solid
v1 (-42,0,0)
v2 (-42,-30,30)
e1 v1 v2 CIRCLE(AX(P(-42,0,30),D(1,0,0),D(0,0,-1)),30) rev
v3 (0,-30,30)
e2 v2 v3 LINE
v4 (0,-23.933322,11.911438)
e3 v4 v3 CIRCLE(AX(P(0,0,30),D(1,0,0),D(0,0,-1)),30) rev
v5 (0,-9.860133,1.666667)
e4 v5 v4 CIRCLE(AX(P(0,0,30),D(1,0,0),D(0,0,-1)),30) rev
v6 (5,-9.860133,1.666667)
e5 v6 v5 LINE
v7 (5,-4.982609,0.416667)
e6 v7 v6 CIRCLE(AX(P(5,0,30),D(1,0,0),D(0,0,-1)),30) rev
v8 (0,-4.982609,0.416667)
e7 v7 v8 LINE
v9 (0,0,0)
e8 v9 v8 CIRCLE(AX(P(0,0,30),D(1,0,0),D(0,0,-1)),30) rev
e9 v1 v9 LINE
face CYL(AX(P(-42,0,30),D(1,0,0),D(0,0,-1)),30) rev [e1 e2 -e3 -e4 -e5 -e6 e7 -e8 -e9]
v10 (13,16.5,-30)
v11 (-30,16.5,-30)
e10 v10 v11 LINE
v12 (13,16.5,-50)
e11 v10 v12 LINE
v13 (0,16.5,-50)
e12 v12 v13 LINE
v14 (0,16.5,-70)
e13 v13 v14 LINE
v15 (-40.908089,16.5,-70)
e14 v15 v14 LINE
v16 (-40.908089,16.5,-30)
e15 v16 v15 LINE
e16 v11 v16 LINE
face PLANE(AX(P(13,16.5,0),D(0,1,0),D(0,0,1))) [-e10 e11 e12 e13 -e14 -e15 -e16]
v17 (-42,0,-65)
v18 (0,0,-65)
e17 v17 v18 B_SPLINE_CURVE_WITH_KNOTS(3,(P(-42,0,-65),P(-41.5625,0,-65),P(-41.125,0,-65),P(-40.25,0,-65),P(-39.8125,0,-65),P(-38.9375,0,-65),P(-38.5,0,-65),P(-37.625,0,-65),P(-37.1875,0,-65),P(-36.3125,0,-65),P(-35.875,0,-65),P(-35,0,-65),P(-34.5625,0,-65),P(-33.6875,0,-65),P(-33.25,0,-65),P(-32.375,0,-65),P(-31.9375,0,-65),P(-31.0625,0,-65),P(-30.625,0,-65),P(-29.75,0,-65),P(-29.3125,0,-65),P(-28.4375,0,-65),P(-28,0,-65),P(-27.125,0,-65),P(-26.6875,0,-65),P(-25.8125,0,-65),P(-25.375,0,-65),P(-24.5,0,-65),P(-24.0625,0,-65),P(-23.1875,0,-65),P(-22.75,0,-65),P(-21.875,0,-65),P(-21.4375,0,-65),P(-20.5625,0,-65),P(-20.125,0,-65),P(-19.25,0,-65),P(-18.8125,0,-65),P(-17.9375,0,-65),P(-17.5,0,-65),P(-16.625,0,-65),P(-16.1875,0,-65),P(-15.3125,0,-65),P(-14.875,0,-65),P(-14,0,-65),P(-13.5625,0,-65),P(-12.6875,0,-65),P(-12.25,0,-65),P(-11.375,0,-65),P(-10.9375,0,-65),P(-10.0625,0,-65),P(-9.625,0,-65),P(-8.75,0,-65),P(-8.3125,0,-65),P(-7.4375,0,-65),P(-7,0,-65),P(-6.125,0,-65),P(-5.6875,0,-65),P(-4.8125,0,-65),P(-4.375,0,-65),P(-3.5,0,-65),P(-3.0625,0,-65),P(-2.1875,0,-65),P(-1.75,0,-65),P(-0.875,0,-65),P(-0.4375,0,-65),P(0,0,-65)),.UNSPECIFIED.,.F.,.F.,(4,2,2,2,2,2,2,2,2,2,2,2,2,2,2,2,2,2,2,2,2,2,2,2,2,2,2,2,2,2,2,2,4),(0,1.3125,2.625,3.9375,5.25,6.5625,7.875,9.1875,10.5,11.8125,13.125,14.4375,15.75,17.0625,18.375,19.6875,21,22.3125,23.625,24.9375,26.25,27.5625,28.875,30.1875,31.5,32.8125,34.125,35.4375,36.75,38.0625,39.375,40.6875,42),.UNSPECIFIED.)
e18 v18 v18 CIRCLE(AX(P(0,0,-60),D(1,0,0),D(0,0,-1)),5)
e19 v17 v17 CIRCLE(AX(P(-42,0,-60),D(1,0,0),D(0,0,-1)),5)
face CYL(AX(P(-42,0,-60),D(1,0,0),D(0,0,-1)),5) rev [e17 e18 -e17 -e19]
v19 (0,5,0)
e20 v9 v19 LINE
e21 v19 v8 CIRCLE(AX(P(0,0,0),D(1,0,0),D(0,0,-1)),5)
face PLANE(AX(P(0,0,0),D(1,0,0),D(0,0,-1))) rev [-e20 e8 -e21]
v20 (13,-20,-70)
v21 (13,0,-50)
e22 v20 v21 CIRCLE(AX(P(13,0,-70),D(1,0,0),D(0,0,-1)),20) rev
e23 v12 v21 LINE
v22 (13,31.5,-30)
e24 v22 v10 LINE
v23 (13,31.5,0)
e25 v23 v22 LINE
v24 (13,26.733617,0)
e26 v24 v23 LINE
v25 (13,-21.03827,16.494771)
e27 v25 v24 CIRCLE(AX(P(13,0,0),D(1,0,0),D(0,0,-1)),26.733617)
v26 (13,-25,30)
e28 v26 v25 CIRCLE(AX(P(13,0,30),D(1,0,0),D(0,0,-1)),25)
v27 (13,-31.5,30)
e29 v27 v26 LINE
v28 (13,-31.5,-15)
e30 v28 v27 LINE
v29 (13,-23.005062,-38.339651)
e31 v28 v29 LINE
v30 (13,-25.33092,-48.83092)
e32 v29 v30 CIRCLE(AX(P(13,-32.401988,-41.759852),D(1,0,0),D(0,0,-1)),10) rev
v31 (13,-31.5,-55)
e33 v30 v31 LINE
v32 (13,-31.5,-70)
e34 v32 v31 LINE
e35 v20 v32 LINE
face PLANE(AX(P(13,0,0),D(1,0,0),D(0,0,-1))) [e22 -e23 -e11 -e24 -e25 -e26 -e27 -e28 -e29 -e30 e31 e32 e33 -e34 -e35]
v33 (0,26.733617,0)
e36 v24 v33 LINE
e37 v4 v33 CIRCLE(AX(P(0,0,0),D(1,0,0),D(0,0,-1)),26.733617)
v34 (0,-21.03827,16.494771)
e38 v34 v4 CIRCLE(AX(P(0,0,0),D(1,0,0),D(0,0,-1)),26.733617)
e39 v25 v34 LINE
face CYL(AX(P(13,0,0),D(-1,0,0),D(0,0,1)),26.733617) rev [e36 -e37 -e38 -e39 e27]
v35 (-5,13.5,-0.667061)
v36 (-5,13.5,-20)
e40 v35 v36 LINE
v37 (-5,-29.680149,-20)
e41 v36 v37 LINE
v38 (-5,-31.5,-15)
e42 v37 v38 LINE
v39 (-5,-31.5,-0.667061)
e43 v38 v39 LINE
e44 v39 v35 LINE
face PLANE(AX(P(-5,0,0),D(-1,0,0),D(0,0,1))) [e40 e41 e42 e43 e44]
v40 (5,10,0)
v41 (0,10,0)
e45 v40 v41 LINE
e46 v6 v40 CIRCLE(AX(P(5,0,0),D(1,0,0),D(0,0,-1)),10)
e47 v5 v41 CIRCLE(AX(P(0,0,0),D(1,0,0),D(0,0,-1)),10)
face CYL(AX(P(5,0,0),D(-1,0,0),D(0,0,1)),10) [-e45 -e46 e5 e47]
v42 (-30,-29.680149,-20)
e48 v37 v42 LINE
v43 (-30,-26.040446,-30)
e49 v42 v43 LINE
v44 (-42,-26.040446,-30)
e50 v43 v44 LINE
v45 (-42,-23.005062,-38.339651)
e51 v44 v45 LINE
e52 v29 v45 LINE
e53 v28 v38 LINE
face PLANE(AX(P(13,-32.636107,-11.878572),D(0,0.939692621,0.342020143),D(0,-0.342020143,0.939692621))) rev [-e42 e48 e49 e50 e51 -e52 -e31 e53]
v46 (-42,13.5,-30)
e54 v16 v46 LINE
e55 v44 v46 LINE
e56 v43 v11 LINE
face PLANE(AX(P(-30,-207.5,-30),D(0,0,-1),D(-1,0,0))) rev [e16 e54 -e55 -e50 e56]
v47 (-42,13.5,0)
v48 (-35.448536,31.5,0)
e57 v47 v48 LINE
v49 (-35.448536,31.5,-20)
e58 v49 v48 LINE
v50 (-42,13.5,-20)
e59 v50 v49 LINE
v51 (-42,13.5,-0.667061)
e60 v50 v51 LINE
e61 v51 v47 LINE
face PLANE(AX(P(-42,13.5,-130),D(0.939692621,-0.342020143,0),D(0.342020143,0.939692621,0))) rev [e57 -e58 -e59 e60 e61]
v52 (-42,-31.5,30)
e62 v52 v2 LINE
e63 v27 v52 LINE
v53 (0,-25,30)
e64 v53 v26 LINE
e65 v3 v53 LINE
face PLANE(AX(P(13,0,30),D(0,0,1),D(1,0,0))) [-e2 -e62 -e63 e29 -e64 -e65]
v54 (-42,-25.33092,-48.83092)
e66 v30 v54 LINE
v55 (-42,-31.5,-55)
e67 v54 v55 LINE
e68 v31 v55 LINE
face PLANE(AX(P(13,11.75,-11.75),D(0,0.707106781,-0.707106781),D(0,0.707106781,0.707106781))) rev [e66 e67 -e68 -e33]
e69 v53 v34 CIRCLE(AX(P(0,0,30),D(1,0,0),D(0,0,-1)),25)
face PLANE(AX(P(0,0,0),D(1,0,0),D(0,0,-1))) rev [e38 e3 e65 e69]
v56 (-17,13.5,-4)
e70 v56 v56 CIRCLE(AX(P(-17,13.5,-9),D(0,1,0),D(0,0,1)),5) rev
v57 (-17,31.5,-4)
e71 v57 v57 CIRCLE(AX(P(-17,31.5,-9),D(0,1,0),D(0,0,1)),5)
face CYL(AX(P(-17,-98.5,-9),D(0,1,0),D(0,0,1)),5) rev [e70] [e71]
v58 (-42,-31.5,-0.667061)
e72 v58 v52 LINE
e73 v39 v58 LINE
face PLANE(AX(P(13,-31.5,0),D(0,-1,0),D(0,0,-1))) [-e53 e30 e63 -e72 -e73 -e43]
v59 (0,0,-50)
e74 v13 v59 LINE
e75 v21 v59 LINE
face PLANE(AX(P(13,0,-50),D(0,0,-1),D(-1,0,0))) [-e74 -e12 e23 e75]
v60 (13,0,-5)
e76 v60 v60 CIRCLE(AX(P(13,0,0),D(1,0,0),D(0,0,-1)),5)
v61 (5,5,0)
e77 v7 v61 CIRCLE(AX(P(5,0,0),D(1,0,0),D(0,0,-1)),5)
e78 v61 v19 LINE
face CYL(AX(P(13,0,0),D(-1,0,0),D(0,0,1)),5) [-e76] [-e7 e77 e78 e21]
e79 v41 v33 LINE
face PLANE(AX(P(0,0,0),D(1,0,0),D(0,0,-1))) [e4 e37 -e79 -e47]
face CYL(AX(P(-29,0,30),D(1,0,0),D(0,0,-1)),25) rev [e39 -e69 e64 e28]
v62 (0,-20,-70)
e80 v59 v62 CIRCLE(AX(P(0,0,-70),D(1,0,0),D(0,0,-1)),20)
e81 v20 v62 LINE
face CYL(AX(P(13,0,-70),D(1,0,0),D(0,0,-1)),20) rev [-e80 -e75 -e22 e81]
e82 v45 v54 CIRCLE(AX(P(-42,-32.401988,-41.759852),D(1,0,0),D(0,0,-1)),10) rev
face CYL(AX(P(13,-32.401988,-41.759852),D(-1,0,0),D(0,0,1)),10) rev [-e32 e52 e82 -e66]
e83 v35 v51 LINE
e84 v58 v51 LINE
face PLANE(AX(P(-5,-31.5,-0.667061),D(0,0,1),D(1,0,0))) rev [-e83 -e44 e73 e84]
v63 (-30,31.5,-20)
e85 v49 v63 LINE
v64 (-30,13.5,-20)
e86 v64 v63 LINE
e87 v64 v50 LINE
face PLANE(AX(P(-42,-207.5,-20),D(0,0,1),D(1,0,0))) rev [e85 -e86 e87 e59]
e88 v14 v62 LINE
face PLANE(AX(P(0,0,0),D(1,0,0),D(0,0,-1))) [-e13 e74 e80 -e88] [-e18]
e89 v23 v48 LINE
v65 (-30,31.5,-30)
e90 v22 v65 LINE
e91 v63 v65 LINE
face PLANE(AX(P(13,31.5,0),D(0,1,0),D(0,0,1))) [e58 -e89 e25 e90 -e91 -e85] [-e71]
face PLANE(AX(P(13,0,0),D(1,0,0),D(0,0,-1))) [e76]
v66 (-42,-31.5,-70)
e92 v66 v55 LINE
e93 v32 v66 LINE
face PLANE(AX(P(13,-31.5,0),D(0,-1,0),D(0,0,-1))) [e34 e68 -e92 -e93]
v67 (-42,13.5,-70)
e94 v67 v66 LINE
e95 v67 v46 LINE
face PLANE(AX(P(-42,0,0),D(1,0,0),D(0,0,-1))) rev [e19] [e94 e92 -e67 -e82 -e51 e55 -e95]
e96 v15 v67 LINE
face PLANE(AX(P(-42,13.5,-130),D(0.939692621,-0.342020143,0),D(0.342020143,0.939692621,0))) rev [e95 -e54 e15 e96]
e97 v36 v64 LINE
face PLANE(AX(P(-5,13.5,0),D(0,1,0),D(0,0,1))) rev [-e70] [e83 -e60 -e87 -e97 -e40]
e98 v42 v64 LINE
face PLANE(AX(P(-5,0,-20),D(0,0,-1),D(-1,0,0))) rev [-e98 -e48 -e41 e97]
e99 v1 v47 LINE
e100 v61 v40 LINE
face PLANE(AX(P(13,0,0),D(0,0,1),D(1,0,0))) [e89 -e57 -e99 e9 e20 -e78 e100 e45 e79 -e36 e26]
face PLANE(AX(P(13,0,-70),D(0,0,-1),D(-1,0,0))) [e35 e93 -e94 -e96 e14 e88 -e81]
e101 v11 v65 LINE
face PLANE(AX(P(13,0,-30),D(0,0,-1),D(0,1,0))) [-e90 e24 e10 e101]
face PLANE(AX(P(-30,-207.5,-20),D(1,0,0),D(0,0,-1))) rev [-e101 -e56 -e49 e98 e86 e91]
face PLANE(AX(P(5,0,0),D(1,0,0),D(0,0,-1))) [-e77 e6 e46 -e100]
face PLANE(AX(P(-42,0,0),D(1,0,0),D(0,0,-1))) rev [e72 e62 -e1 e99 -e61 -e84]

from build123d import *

# Parameters (mm, degrees)
BOSS_EXTRUDE4_DEPTH = 13
BOSS_EXTRUDE5_DEPTH = 5
FILLET2_R           = 20
BOSS_EXTRUDE6_START = -42
SKETCH2_7_R         = 5
BOSS_EXTRUDE6_DEPTH = 42
SKETCH5_R           = 25
CUT_EXTRUDE1_DEPTH  = 42
SKETCH7_W           = 12
SKETCH7_H           = 10
CUT_EXTRUDE2_DEPTH  = 239
SKETCH8_R           = 5
CUT_EXTRUDE3_DEPTH  = 130
CUT_EXTRUDE4_DEPTH  = 130
CUT_EXTRUDE6_DEPTH  = 37


with BuildPart() as part:
    # Sketch2 → Boss-Extrude4 (new body)
    with BuildSketch(Plane(origin=(0, 0, 0), x_dir=(0, 0, -1), z_dir=(1, 0, 0))):
        with BuildLine():
            Line((0, 31.5), (0, 26.733616794))
            ThreePointArc((0, 26.733616794), (26.024128556, -6.118087921), (-11.911437782, -23.933322312))
            ThreePointArc((-11.911437782, -23.933322312), (-20.46059932, -28.4429224), (-30, -30))
            Line((-30, -30), (-30, -31.5))
            Line((-30, -31.5), (15, -31.5))
            Line((15, -31.5), (38.339650933, -23.005061782))
            ThreePointArc((38.339650933, -23.005061782), (43.924248506, -22.639027919), (48.830920178, -25.330920178))
            Line((48.830920178, -25.330920178), (55, -31.5))
            Line((55, -31.5), (70, -31.5))
            Line((70, -31.5), (70, -20))
            Line((70, -20), (50, -20))
            Line((50, -20), (50, 16.5))
            Line((50, 16.5), (30, 16.5))
            Line((30, 16.5), (30, 31.5))
            Line((30, 31.5), (0, 31.5))
        make_face()
        with BuildLine():
            ThreePointArc((5, 0), (3.535533906, 3.535533906), (0, 5))
            Line((0, 5), (0, 0))
            ThreePointArc((0, 0), (-0.104348142, -2.5), (-0.416666667, -4.982608643))
            ThreePointArc((-0.416666667, -4.982608643), (3.385016002, -3.679900361), (5, 0))
        make_face()
        with BuildLine():
            Line((0, 0), (0, 5))
            ThreePointArc((0, 5), (-3.549297202, 3.521716822), (-4.999847865, -0.03900425))
            ThreePointArc((-4.999847865, -0.03900425), (-3.666669267, -3.399343537), (-0.416666667, -4.982608643))
            ThreePointArc((-0.416666667, -4.982608643), (-0.104348142, -2.5), (0, 0))
        make_face()
        with BuildLine():
            ThreePointArc((-30, -30), (-20.46059932, -28.4429224), (-11.911437782, -23.933322312))
            ThreePointArc((-11.911437782, -23.933322312), (-15.61180413, -21.701563048), (-18.904262251, -18.902781162))
            ThreePointArc((-18.904262251, -18.902781162), (-24.302172741, -20.842036984), (-30, -21.5))
            Line((-30, -21.5), (-30, -30))
        make_face()
    extrude(amount=BOSS_EXTRUDE4_DEPTH)

    # Sketch2<6> → Boss-Extrude5 (add)
    with BuildSketch(Plane(origin=(0, 0, 0), x_dir=(0, 0, -1), z_dir=(1, 0, 0))):
        with BuildLine():
            ThreePointArc((-1.666666667, -9.860132972), (9.964971895, -0.836262603), (0, 10))
            Line((0, 10), (0, 5))
            ThreePointArc((0, 5), (3.535533906, 3.535533906), (5, 0))
            ThreePointArc((5, 0), (3.385016002, -3.679900361), (-0.416666667, -4.982608643))
            ThreePointArc((-0.416666667, -4.982608643), (-0.939156407, -7.447641886), (-1.666666667, -9.860132972))
        make_face()
    extrude(amount=BOSS_EXTRUDE5_DEPTH)

    # Fillet2
    fillet2_edges = [part.edges().sort_by_distance(p)[0] for p in [
        (6.5, -20, -50),
    ]]
    fillet(fillet2_edges, radius=FILLET2_R - 0.0001)  # a hair under: the kernel refuses the full size

    # Sketch2<7> → Boss-Extrude6 (add)
    with BuildSketch(Plane(origin=(0, 0, 0), x_dir=(0, 0, -1), z_dir=(1, 0, 0)).offset(BOSS_EXTRUDE6_START)):
        with BuildLine():
            Line((-30, -30), (-30, -31.5))
            Line((-30, -31.5), (15, -31.5))
            Line((15, -31.5), (38.339650933, -23.005061782))
            ThreePointArc((38.339650933, -23.005061782), (43.924248506, -22.639027919), (48.830920178, -25.330920178))
            Line((48.830920178, -25.330920178), (55, -31.5))
            Line((55, -31.5), (70, -31.5))
            Line((70, -31.5), (70, 16.5))
            Line((70, 16.5), (30, 16.5))
            Line((30, 16.5), (30, 31.5))
            Line((30, 31.5), (0, 31.5))
            Line((0, 31.5), (0, 0))
            ThreePointArc((0, 0), (-8.786796564, -21.213203436), (-30, -30))
        make_face()
        with Locations((60, 0)):
            Circle(SKETCH2_7_R, mode=Mode.SUBTRACT)
    extrude(amount=BOSS_EXTRUDE6_DEPTH)

    # Sketch5 → Cut-Extrude1 (cut)
    with BuildSketch(Plane(origin=(13, 0, 0), x_dir=(0, 0, -1), z_dir=(1, 0, 0))):
        with Locations((-30, 0)):
            Circle(SKETCH5_R)
    extrude(amount=-CUT_EXTRUDE1_DEPTH, mode=Mode.SUBTRACT)

    # Sketch7 → Cut-Extrude2 (cut)
    with BuildSketch(Plane(origin=(0, 31.5, 0), x_dir=(1, 0, 0), z_dir=(0, 1, 0))):
        with Locations((-36, 25)):
            Rectangle(SKETCH7_W, SKETCH7_H)
    extrude(amount=-CUT_EXTRUDE2_DEPTH, mode=Mode.SUBTRACT)

    # Sketch8 → Cut-Extrude3 (cut)
    with BuildSketch(Plane(origin=(0, 31.5, 0), x_dir=(1, 0, 0), z_dir=(0, 1, 0))):
        with Locations(Location((-17, 9, 0), (0, 0, 270))):
            Circle(SKETCH8_R)
    extrude(amount=-CUT_EXTRUDE3_DEPTH, mode=Mode.SUBTRACT)

    # Sketch9 → Cut-Extrude4 (cut)
    with BuildSketch(Plane.XY):
        Polygon((-42, 31.5), (-42, 13.5), (-35.448535783, 31.5), align=None)
    extrude(amount=-CUT_EXTRUDE4_DEPTH, mode=Mode.SUBTRACT)

    # Sketch10 → Cut-Extrude6 (cut)
    with BuildSketch(Plane.ZY.offset(42)):
        Polygon((-0.667060513, 13.5), (-20, 13.5), (-20, -29.680148829), (-15, -31.5), (-0.667060513, -31.5), align=None)
    extrude(amount=-CUT_EXTRUDE6_DEPTH, mode=Mode.SUBTRACT)


solid = part.part
